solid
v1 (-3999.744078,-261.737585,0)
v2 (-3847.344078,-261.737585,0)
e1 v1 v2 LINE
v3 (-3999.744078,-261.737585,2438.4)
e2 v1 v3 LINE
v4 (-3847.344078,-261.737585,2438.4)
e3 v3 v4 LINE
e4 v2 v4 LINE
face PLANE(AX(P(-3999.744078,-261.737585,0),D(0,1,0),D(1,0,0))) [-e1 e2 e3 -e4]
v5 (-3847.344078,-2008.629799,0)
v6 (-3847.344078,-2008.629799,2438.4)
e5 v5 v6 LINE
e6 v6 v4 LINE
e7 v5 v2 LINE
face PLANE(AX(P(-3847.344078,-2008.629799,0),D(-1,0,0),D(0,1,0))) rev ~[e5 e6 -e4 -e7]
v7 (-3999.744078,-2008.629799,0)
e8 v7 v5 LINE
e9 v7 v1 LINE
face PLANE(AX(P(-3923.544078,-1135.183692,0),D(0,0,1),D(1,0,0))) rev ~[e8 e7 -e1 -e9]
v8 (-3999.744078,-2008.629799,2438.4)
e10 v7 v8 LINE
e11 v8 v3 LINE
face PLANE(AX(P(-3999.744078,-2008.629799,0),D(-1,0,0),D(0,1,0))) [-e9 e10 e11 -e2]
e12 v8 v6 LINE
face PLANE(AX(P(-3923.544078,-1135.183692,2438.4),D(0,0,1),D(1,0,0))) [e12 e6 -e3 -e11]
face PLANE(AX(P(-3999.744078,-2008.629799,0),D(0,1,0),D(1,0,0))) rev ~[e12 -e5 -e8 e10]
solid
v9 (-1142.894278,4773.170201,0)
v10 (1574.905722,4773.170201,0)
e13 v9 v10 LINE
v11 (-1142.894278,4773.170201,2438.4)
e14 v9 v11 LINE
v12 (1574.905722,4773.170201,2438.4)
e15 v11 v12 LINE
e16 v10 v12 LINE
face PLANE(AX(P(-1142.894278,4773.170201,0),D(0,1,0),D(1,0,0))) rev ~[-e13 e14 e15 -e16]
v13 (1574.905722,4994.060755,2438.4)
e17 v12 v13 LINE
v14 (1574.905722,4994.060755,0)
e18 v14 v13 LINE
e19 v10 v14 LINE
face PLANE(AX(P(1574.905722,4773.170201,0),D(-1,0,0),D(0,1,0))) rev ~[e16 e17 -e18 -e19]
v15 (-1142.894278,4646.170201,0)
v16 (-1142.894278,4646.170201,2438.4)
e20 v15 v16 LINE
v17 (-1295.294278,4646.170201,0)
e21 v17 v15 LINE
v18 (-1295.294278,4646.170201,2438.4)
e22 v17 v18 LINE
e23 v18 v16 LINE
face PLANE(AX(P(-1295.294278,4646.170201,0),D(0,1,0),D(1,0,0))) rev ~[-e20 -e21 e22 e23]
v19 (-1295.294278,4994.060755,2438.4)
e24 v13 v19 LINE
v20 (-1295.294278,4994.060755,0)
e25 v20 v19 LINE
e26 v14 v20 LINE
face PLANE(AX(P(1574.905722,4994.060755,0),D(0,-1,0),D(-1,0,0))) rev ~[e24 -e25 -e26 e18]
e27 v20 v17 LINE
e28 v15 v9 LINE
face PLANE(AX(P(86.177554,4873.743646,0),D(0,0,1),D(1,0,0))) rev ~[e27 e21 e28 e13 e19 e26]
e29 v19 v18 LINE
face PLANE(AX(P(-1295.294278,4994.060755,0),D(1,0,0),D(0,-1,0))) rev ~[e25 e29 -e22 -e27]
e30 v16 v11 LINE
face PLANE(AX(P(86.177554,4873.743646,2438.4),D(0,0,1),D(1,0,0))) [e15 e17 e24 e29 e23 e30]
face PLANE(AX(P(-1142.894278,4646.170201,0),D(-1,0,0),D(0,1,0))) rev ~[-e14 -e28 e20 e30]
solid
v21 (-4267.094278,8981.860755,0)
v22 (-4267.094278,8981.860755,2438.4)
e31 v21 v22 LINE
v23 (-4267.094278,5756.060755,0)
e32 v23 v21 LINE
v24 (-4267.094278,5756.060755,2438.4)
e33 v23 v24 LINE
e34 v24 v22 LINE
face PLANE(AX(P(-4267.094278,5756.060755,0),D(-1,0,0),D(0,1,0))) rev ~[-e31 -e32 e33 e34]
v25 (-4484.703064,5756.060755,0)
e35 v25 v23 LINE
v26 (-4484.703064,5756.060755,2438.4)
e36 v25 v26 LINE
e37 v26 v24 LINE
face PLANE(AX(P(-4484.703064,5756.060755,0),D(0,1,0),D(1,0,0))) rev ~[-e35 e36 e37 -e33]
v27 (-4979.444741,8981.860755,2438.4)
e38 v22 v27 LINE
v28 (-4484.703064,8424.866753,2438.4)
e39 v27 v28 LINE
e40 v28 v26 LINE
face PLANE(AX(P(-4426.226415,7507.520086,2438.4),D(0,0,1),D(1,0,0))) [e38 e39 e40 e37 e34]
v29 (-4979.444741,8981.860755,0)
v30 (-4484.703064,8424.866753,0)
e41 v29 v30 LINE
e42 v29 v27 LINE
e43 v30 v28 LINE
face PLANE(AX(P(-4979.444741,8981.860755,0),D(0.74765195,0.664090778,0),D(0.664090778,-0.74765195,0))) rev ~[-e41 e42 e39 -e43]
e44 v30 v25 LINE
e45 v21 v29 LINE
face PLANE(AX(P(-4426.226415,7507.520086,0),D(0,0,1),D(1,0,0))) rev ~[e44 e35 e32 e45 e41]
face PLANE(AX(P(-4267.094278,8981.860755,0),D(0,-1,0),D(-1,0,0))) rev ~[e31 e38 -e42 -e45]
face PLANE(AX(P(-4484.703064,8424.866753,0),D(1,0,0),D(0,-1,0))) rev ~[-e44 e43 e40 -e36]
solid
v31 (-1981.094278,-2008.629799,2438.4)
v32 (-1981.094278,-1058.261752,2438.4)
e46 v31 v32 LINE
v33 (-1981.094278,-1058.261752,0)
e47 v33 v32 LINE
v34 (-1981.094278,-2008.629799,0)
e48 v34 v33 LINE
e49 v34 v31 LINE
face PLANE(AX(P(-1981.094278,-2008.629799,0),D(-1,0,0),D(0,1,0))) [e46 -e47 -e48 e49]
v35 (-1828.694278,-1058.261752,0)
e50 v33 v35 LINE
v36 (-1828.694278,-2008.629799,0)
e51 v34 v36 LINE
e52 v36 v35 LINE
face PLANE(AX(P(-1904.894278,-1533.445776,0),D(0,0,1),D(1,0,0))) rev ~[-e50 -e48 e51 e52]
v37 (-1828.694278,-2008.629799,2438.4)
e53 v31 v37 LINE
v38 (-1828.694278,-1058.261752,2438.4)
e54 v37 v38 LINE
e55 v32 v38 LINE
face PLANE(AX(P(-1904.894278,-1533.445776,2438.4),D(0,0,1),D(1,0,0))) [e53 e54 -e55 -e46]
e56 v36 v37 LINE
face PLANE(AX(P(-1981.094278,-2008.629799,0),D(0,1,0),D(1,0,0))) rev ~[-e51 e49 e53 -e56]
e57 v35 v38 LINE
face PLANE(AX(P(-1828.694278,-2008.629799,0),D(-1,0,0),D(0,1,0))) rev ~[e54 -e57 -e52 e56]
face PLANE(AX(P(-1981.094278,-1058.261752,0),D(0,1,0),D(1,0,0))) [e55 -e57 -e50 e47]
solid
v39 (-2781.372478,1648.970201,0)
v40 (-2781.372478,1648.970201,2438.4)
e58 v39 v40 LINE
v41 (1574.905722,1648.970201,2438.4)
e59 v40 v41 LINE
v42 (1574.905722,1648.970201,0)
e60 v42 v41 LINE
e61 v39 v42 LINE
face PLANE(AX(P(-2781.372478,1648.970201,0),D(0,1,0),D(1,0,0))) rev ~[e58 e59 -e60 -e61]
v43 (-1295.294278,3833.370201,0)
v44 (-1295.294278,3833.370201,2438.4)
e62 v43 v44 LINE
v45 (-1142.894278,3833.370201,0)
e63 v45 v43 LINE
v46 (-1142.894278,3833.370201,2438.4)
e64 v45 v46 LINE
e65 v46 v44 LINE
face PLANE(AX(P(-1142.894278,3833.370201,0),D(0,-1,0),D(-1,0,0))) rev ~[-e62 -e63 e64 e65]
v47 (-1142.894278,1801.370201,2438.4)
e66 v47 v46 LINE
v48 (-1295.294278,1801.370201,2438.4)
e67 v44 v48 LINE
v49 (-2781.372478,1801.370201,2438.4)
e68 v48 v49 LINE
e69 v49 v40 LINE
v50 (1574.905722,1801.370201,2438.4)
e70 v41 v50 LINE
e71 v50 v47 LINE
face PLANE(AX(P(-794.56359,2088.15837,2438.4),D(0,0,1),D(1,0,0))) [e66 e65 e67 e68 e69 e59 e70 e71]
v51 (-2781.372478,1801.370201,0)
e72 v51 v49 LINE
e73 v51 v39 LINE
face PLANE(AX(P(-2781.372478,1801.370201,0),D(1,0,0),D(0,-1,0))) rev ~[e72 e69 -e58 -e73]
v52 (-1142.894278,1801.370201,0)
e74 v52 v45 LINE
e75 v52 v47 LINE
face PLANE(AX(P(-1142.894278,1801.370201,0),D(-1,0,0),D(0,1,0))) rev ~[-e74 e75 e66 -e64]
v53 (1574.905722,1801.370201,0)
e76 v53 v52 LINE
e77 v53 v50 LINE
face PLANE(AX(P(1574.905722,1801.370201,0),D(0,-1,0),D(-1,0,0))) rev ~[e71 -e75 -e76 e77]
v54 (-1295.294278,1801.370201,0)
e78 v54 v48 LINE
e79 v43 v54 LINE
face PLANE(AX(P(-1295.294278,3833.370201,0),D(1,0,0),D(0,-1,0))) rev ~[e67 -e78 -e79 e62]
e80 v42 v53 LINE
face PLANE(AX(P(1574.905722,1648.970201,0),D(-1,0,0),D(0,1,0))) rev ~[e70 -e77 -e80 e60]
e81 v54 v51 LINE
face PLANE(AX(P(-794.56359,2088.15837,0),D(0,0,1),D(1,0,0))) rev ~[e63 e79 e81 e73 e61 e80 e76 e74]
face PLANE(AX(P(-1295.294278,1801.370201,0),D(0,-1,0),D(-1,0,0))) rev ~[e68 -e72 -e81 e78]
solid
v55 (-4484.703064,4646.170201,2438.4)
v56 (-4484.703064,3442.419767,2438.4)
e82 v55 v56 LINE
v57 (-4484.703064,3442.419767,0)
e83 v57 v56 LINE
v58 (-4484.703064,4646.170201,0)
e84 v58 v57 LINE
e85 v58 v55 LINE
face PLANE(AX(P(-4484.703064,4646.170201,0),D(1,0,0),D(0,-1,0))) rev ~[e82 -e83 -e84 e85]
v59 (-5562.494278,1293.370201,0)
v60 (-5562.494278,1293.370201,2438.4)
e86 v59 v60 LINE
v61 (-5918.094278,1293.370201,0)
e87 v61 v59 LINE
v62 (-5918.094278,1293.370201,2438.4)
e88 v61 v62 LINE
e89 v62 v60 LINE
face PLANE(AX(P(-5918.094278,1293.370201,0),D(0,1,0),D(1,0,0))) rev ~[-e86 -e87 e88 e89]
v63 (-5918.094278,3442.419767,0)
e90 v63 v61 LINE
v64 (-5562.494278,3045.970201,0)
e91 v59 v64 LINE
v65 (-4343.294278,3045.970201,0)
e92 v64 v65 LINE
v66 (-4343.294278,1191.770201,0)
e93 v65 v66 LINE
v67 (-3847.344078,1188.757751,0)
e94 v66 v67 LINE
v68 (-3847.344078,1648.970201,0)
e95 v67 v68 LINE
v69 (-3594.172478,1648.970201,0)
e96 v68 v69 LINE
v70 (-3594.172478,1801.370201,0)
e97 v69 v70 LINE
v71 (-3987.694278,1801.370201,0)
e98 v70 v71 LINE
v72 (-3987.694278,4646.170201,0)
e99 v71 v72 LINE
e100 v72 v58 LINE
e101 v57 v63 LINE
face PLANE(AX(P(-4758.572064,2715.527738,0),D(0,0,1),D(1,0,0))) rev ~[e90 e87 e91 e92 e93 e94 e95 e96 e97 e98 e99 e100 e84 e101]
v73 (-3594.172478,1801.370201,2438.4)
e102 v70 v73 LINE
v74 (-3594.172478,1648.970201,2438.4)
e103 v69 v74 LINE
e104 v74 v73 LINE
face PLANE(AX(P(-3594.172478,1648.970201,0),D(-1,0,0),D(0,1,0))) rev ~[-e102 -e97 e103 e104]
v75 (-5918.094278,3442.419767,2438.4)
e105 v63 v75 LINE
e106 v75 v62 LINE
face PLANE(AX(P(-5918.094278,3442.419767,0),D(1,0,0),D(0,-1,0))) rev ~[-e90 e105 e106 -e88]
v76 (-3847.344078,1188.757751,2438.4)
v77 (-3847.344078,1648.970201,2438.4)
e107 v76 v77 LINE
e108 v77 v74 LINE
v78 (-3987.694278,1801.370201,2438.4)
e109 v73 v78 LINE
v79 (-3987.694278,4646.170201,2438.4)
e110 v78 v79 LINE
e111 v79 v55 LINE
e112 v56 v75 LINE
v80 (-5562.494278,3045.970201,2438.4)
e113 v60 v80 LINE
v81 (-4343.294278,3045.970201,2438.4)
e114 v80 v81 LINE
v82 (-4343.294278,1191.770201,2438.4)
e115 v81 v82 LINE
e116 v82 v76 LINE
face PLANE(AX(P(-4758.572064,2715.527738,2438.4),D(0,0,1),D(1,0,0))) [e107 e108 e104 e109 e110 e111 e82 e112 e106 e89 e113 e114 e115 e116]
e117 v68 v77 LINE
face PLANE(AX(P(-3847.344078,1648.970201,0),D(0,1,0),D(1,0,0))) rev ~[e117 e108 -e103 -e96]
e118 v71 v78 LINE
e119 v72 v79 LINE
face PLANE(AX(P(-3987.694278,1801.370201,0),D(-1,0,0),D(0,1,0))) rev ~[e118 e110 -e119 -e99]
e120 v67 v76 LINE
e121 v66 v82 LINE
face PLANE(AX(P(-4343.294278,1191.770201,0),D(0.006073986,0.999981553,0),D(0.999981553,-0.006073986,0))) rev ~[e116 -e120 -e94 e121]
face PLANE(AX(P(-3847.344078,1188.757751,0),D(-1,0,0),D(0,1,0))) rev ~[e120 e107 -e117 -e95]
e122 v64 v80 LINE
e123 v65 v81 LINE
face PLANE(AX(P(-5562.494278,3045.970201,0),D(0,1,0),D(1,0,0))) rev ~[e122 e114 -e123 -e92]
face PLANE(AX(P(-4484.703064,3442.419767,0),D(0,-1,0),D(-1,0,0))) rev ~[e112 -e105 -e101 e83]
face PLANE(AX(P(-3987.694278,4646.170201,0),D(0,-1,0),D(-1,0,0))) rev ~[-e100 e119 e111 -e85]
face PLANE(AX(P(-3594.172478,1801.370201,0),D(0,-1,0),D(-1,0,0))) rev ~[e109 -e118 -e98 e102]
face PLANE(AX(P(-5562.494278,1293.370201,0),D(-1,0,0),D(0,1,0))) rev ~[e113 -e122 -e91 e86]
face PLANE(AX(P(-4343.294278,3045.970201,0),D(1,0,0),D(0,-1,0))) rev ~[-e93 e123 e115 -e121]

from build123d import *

# Parameters (mm, degrees)
F1_DEPTH = 2438.4
F0_W     = 152.4
F0_H     = 950.3680467606
F0_H_2   = 1746.8922138214


# Not quite as in the source:
# - the program builds the solid bodies; features that only make, move or delete a surface that nothing else refers to are left out


with BuildPart() as f1:
    # F0 (on Top) → F1 (new body)
    with BuildSketch(Plane.XY):
        Polygon((-3847.3440776825, 1188.7577511787), (-3847.3440776825, 1648.9702011108), (-3594.1724777222, 1648.9702011108), (-3594.1724777222, 1801.3702011108), (-3987.6942779541, 1801.3702011108), (-3987.6942779541, 4646.1702011108), (-4484.7030639648, 4646.1702011108), (-4484.7030639648, 3442.4197673798), (-5918.0942779541, 3442.4197673798), (-5918.0942779541, 3045.9702011108), (-5918.0942779541, 1293.3702011108), (-5562.4942779541, 1293.3702011108), (-5562.4942779541, 3045.9702011108), (-4343.2942779541, 3045.9702011108), (-4343.2942779541, 1191.7702011108), align=None)
    extrude(amount=F1_DEPTH)


with BuildPart() as f1b:
    # F0 (on Top) → F1, piece 2 (new body)
    with BuildSketch(Plane.XY):
        Polygon((-4267.0942779541, 5756.060754776), (-4267.0942779541, 8981.860754776), (-4979.4447412196, 8981.860754776), (-4484.7030639648, 8424.8667533997), (-4484.7030639648, 5930.2643890381), (-4484.7030639648, 5756.060754776), align=None)
    extrude(amount=F1_DEPTH)


with BuildPart() as f1c:
    # F0 (on Top) → F1, piece 3 (new body)
    with BuildSketch(Plane.XY):
        Polygon((-1142.8942779541, 4773.1702011108), (1574.9057220459, 4773.1702011108), (1574.9057220459, 4994.060754776), (-1295.2942779541, 4994.060754776), (-1295.2942779541, 4646.1702011108), (-1142.8942779541, 4646.1702011108), align=None)
    extrude(amount=F1_DEPTH)


with BuildPart() as f1d:
    # F0 (on Top) → F1, piece 4 (new body)
    with BuildSketch(Plane.XY):
        Polygon((-2781.3724777222, 1648.9702011108), (1574.9057220459, 1648.9702011108), (1574.9057220459, 1801.3702011108), (-1142.8942779541, 1801.3702011108), (-1142.8942779541, 3833.3702011108), (-1295.2942779541, 3833.3702011108), (-1295.2942779541, 1801.3702011108), (-2781.3724777222, 1801.3702011108), align=None)
    extrude(amount=F1_DEPTH)


with BuildPart() as f1e:
    # F0 (on Top) → F1, piece 5 (new body)
    with BuildSketch(Plane.XY):
        with Locations((-1904.8942779541, -1533.4457755089)):
            Rectangle(F0_W, F0_H)
    extrude(amount=F1_DEPTH)


with BuildPart() as f1f:
    # F0 (on Top) → F1, piece 6 (new body)
    with BuildSketch(Plane.XY):
        with Locations((-3923.5440776825, -1135.1836919785)):
            Rectangle(F0_W, F0_H_2)
    extrude(amount=F1_DEPTH)


solid = Compound([f1.part, f1b.part, f1c.part, f1d.part, f1e.part, f1f.part])
